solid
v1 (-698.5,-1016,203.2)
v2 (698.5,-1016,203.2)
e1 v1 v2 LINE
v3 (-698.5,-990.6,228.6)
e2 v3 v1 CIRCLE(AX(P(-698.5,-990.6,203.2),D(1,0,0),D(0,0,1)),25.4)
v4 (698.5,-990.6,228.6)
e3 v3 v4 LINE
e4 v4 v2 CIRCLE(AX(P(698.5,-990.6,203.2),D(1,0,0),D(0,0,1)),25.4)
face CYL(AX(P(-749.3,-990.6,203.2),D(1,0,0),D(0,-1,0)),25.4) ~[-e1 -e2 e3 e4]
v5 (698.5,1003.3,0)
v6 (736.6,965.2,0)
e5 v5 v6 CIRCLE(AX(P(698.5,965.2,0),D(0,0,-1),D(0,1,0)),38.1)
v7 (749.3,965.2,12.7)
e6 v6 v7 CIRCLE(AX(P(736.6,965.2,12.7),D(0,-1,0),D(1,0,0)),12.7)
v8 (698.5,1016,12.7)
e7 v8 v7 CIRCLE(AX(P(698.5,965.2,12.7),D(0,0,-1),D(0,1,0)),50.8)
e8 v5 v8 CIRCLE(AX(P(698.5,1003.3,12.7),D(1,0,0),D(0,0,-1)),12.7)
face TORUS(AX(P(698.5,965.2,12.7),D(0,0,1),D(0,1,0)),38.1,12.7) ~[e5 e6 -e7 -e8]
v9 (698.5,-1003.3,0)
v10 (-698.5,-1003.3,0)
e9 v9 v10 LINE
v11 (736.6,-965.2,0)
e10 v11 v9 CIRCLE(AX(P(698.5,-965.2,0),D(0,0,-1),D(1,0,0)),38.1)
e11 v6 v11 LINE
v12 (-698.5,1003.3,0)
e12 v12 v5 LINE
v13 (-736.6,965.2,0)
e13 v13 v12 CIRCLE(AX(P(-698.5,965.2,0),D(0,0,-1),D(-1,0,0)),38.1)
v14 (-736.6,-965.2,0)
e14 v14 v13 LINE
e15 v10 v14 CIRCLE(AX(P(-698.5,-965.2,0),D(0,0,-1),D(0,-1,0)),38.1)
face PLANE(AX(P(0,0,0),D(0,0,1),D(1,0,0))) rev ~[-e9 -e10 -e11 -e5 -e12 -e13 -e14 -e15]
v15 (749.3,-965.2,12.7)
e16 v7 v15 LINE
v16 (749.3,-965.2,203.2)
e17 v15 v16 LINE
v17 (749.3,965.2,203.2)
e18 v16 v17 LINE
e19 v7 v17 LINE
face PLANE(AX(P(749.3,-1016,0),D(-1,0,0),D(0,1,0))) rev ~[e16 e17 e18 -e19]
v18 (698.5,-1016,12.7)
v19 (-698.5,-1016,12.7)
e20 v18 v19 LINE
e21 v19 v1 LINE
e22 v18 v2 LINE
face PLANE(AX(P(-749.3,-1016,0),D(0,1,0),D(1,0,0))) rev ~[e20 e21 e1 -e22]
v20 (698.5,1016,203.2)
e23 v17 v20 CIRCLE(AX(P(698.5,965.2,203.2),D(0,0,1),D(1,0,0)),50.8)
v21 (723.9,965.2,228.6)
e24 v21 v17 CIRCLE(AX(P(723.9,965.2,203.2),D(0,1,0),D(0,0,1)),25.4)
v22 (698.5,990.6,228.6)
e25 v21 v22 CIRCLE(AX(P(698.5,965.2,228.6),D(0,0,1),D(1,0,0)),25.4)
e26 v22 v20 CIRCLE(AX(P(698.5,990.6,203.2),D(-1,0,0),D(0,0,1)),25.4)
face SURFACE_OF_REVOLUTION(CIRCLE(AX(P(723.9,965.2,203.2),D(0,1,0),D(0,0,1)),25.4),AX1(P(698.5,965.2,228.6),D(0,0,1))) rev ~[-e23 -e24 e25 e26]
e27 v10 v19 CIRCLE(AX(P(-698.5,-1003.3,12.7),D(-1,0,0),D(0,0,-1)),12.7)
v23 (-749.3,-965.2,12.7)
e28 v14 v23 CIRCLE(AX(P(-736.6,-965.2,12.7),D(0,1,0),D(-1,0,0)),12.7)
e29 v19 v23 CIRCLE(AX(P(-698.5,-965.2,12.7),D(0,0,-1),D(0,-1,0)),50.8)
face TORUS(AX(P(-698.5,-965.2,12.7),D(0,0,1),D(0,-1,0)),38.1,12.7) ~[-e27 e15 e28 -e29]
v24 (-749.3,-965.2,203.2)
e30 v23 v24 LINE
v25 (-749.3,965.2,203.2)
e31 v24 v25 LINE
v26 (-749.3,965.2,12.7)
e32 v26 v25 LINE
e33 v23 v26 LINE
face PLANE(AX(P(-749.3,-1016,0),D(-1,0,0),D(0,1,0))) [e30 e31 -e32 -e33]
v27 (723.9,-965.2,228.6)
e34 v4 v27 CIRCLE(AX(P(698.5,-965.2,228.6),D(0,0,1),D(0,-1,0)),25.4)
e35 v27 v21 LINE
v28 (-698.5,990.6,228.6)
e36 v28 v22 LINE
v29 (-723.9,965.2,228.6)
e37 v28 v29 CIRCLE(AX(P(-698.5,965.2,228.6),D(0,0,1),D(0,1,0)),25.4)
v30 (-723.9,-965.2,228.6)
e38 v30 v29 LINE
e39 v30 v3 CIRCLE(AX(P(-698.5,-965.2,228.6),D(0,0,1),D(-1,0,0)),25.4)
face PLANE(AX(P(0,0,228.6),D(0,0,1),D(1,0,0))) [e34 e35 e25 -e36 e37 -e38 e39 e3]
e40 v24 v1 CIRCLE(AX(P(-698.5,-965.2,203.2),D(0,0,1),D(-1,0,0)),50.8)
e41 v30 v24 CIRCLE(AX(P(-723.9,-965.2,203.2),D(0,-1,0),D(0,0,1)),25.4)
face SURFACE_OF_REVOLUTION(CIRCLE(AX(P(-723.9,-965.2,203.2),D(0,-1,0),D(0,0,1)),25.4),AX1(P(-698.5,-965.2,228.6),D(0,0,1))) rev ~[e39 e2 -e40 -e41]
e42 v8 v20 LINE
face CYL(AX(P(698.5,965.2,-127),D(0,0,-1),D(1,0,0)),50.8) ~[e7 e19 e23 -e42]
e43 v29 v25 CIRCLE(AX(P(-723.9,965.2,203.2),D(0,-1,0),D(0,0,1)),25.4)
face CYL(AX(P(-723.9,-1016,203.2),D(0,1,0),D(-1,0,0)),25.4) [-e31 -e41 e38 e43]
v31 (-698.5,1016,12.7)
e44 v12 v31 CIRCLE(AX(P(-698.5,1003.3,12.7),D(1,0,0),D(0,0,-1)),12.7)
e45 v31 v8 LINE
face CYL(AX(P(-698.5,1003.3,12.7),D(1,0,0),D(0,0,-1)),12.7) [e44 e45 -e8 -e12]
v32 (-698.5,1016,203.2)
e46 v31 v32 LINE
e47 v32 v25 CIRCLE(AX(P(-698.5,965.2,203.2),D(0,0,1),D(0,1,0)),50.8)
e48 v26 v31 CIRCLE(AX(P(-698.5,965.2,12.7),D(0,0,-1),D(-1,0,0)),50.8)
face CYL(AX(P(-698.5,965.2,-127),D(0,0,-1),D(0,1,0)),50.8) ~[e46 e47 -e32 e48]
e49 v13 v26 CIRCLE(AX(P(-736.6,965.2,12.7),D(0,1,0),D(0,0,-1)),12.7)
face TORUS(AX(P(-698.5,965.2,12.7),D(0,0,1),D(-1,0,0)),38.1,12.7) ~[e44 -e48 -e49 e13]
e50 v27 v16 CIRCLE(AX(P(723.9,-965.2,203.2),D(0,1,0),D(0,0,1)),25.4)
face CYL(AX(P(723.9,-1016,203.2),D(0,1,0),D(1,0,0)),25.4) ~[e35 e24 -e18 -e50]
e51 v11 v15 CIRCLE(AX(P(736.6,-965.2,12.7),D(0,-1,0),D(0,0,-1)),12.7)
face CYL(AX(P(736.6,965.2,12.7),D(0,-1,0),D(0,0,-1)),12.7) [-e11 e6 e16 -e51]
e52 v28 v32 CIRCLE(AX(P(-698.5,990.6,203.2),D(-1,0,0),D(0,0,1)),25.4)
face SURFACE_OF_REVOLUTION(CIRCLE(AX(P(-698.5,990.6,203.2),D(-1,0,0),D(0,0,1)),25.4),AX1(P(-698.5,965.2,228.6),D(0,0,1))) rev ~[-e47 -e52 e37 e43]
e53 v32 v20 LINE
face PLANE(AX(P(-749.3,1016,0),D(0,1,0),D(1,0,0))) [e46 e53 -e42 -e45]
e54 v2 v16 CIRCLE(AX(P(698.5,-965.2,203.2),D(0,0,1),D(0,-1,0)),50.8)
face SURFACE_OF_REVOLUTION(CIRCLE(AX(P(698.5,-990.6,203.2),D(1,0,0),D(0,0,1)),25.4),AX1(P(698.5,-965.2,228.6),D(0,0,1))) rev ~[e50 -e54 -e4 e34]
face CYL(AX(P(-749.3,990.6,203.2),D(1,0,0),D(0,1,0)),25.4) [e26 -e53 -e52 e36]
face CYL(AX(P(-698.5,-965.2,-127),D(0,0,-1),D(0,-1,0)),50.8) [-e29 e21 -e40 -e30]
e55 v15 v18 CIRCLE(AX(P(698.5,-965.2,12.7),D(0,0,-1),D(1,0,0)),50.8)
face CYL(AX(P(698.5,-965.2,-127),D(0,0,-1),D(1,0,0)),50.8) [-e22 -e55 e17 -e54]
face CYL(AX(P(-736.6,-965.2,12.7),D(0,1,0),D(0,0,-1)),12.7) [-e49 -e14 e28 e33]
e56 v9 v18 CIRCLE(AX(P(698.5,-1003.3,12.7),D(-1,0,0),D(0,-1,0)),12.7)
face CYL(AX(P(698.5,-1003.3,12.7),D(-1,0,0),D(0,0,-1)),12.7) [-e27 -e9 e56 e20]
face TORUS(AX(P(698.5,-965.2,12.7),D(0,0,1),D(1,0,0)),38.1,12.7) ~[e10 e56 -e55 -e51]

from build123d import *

# Parameters (mm, degrees)
F0_W         = 1498.6
F0_H         = 2032
F1_DEPTH     = 228.6
F2_R         = 25.4
F3_T1_DEPTH  = 355.6
F3_T4_ANGLE  = 90
F3_T6_ANGLE  = 90
F3_T8_ANGLE  = 90
F3_T10_ANGLE = 90
F4_R         = 12.7


# Not quite as in the source:
# - a fillet or chamfer that OpenCascade refuses, or shapes differently, is made with other operations: its cross-section is extruded or revolved along the edge and cut away or added


with BuildPart() as f1:
    # F0 (on Top) → F1 (new body)
    with BuildSketch(Plane.XY):
        Rectangle(F0_W, F0_H)
    extrude(amount=F1_DEPTH)

    # F2
    f2_edges = [f1.edges().sort_by_distance(p)[0] for p in [
        (-749.3, 0, 228.6),
        (0, -1016, 228.6),
        (749.3, 0, 228.6),
        (0, 1016, 228.6),
    ]]
    fillet(f2_edges, radius=F2_R)

    # F3: fillet of radius 50.8 on 4 edges, made by hand

    # F3_s2 → F3_t1 (cut)
    with BuildSketch(Plane.XY.offset(-127)):
        with BuildLine():
            ThreePointArc((-698.5, -1016), (-734.4210244843, -1001.1210244843), (-749.3, -965.2))
            Line((-749.3, -965.2), (-749.3, -1016))
            Line((-749.3, -1016), (-698.5, -1016))
        make_face()
        with BuildLine():
            ThreePointArc((749.3, -965.2), (734.4210244843, -1001.1210244843), (698.5, -1016))
            Line((698.5, -1016), (749.3, -1016))
            Line((749.3, -1016), (749.3, -965.2))
        make_face()
        with BuildLine():
            ThreePointArc((-698.5, 1016), (-734.4210244843, 1001.1210244843), (-749.3, 965.2))
            Line((-749.3, 965.2), (-749.3, 1016))
            Line((-749.3, 1016), (-698.5, 1016))
        make_face()
        with BuildLine():
            ThreePointArc((749.3, 965.2), (734.4210244843, 1001.1210244843), (698.5, 1016))
            Line((698.5, 1016), (749.3, 1016))
            Line((749.3, 1016), (749.3, 965.2))
        make_face()
    extrude(amount=F3_T1_DEPTH, mode=Mode.SUBTRACT)

    # F3_s3 → F3_t4 (revolve, cut)
    with BuildSketch(Plane.XZ.offset(-965.2)):
        with BuildLine():
            ThreePointArc((723.9, 228.6), (741.8605122421, 221.1605122421), (749.3, 203.2))
            Line((749.3, 203.2), (749.3, 228.6))
            Line((749.3, 228.6), (723.9, 228.6))
        make_face()
    revolve(axis=Axis((698.5, 965.2, 228.6), (0, 0, 1)), revolution_arc=F3_T4_ANGLE, mode=Mode.SUBTRACT)

    # F3_s5 → F3_t6 (revolve, cut)
    with BuildSketch(Plane.YZ.offset(-698.5)):
        with BuildLine():
            ThreePointArc((990.6, 228.6), (1008.5605122421, 221.1605122421), (1016, 203.2))
            Line((1016, 203.2), (1016, 228.6))
            Line((1016, 228.6), (990.6, 228.6))
        make_face()
    revolve(axis=Axis((-698.5, 965.2, 228.6), (0, 0, 1)), revolution_arc=F3_T6_ANGLE, mode=Mode.SUBTRACT)

    # F3_s7 → F3_t8 (revolve, cut)
    with BuildSketch(Plane.YZ.offset(698.5)):
        with BuildLine():
            ThreePointArc((-990.6, 228.6), (-1008.5605122421, 221.1605122421), (-1016, 203.2))
            Line((-1016, 203.2), (-1016, 228.6))
            Line((-1016, 228.6), (-990.6, 228.6))
        make_face()
    revolve(axis=Axis((698.5, -965.2, 228.6), (0, 0, 1)), revolution_arc=F3_T8_ANGLE, mode=Mode.SUBTRACT)

    # F3_s9 → F3_t10 (revolve, cut)
    with BuildSketch(Plane.XZ.offset(965.2)):
        with BuildLine():
            ThreePointArc((-723.9, 228.6), (-741.8605122421, 221.1605122421), (-749.3, 203.2))
            Line((-749.3, 203.2), (-749.3, 228.6))
            Line((-749.3, 228.6), (-723.9, 228.6))
        make_face()
    revolve(axis=Axis((-698.5, -965.2, 228.6), (0, 0, 1)), revolution_arc=F3_T10_ANGLE, mode=Mode.SUBTRACT)

    # F4
    f4_edges = [f1.edges().sort_by_distance(p)[0] for p in [
        (0, 1016, 0),
        (-749.3, 0, 0),
        (0, -1016, 0),
    ]]
    fillet(f4_edges, radius=F4_R)


solid = f1.part
